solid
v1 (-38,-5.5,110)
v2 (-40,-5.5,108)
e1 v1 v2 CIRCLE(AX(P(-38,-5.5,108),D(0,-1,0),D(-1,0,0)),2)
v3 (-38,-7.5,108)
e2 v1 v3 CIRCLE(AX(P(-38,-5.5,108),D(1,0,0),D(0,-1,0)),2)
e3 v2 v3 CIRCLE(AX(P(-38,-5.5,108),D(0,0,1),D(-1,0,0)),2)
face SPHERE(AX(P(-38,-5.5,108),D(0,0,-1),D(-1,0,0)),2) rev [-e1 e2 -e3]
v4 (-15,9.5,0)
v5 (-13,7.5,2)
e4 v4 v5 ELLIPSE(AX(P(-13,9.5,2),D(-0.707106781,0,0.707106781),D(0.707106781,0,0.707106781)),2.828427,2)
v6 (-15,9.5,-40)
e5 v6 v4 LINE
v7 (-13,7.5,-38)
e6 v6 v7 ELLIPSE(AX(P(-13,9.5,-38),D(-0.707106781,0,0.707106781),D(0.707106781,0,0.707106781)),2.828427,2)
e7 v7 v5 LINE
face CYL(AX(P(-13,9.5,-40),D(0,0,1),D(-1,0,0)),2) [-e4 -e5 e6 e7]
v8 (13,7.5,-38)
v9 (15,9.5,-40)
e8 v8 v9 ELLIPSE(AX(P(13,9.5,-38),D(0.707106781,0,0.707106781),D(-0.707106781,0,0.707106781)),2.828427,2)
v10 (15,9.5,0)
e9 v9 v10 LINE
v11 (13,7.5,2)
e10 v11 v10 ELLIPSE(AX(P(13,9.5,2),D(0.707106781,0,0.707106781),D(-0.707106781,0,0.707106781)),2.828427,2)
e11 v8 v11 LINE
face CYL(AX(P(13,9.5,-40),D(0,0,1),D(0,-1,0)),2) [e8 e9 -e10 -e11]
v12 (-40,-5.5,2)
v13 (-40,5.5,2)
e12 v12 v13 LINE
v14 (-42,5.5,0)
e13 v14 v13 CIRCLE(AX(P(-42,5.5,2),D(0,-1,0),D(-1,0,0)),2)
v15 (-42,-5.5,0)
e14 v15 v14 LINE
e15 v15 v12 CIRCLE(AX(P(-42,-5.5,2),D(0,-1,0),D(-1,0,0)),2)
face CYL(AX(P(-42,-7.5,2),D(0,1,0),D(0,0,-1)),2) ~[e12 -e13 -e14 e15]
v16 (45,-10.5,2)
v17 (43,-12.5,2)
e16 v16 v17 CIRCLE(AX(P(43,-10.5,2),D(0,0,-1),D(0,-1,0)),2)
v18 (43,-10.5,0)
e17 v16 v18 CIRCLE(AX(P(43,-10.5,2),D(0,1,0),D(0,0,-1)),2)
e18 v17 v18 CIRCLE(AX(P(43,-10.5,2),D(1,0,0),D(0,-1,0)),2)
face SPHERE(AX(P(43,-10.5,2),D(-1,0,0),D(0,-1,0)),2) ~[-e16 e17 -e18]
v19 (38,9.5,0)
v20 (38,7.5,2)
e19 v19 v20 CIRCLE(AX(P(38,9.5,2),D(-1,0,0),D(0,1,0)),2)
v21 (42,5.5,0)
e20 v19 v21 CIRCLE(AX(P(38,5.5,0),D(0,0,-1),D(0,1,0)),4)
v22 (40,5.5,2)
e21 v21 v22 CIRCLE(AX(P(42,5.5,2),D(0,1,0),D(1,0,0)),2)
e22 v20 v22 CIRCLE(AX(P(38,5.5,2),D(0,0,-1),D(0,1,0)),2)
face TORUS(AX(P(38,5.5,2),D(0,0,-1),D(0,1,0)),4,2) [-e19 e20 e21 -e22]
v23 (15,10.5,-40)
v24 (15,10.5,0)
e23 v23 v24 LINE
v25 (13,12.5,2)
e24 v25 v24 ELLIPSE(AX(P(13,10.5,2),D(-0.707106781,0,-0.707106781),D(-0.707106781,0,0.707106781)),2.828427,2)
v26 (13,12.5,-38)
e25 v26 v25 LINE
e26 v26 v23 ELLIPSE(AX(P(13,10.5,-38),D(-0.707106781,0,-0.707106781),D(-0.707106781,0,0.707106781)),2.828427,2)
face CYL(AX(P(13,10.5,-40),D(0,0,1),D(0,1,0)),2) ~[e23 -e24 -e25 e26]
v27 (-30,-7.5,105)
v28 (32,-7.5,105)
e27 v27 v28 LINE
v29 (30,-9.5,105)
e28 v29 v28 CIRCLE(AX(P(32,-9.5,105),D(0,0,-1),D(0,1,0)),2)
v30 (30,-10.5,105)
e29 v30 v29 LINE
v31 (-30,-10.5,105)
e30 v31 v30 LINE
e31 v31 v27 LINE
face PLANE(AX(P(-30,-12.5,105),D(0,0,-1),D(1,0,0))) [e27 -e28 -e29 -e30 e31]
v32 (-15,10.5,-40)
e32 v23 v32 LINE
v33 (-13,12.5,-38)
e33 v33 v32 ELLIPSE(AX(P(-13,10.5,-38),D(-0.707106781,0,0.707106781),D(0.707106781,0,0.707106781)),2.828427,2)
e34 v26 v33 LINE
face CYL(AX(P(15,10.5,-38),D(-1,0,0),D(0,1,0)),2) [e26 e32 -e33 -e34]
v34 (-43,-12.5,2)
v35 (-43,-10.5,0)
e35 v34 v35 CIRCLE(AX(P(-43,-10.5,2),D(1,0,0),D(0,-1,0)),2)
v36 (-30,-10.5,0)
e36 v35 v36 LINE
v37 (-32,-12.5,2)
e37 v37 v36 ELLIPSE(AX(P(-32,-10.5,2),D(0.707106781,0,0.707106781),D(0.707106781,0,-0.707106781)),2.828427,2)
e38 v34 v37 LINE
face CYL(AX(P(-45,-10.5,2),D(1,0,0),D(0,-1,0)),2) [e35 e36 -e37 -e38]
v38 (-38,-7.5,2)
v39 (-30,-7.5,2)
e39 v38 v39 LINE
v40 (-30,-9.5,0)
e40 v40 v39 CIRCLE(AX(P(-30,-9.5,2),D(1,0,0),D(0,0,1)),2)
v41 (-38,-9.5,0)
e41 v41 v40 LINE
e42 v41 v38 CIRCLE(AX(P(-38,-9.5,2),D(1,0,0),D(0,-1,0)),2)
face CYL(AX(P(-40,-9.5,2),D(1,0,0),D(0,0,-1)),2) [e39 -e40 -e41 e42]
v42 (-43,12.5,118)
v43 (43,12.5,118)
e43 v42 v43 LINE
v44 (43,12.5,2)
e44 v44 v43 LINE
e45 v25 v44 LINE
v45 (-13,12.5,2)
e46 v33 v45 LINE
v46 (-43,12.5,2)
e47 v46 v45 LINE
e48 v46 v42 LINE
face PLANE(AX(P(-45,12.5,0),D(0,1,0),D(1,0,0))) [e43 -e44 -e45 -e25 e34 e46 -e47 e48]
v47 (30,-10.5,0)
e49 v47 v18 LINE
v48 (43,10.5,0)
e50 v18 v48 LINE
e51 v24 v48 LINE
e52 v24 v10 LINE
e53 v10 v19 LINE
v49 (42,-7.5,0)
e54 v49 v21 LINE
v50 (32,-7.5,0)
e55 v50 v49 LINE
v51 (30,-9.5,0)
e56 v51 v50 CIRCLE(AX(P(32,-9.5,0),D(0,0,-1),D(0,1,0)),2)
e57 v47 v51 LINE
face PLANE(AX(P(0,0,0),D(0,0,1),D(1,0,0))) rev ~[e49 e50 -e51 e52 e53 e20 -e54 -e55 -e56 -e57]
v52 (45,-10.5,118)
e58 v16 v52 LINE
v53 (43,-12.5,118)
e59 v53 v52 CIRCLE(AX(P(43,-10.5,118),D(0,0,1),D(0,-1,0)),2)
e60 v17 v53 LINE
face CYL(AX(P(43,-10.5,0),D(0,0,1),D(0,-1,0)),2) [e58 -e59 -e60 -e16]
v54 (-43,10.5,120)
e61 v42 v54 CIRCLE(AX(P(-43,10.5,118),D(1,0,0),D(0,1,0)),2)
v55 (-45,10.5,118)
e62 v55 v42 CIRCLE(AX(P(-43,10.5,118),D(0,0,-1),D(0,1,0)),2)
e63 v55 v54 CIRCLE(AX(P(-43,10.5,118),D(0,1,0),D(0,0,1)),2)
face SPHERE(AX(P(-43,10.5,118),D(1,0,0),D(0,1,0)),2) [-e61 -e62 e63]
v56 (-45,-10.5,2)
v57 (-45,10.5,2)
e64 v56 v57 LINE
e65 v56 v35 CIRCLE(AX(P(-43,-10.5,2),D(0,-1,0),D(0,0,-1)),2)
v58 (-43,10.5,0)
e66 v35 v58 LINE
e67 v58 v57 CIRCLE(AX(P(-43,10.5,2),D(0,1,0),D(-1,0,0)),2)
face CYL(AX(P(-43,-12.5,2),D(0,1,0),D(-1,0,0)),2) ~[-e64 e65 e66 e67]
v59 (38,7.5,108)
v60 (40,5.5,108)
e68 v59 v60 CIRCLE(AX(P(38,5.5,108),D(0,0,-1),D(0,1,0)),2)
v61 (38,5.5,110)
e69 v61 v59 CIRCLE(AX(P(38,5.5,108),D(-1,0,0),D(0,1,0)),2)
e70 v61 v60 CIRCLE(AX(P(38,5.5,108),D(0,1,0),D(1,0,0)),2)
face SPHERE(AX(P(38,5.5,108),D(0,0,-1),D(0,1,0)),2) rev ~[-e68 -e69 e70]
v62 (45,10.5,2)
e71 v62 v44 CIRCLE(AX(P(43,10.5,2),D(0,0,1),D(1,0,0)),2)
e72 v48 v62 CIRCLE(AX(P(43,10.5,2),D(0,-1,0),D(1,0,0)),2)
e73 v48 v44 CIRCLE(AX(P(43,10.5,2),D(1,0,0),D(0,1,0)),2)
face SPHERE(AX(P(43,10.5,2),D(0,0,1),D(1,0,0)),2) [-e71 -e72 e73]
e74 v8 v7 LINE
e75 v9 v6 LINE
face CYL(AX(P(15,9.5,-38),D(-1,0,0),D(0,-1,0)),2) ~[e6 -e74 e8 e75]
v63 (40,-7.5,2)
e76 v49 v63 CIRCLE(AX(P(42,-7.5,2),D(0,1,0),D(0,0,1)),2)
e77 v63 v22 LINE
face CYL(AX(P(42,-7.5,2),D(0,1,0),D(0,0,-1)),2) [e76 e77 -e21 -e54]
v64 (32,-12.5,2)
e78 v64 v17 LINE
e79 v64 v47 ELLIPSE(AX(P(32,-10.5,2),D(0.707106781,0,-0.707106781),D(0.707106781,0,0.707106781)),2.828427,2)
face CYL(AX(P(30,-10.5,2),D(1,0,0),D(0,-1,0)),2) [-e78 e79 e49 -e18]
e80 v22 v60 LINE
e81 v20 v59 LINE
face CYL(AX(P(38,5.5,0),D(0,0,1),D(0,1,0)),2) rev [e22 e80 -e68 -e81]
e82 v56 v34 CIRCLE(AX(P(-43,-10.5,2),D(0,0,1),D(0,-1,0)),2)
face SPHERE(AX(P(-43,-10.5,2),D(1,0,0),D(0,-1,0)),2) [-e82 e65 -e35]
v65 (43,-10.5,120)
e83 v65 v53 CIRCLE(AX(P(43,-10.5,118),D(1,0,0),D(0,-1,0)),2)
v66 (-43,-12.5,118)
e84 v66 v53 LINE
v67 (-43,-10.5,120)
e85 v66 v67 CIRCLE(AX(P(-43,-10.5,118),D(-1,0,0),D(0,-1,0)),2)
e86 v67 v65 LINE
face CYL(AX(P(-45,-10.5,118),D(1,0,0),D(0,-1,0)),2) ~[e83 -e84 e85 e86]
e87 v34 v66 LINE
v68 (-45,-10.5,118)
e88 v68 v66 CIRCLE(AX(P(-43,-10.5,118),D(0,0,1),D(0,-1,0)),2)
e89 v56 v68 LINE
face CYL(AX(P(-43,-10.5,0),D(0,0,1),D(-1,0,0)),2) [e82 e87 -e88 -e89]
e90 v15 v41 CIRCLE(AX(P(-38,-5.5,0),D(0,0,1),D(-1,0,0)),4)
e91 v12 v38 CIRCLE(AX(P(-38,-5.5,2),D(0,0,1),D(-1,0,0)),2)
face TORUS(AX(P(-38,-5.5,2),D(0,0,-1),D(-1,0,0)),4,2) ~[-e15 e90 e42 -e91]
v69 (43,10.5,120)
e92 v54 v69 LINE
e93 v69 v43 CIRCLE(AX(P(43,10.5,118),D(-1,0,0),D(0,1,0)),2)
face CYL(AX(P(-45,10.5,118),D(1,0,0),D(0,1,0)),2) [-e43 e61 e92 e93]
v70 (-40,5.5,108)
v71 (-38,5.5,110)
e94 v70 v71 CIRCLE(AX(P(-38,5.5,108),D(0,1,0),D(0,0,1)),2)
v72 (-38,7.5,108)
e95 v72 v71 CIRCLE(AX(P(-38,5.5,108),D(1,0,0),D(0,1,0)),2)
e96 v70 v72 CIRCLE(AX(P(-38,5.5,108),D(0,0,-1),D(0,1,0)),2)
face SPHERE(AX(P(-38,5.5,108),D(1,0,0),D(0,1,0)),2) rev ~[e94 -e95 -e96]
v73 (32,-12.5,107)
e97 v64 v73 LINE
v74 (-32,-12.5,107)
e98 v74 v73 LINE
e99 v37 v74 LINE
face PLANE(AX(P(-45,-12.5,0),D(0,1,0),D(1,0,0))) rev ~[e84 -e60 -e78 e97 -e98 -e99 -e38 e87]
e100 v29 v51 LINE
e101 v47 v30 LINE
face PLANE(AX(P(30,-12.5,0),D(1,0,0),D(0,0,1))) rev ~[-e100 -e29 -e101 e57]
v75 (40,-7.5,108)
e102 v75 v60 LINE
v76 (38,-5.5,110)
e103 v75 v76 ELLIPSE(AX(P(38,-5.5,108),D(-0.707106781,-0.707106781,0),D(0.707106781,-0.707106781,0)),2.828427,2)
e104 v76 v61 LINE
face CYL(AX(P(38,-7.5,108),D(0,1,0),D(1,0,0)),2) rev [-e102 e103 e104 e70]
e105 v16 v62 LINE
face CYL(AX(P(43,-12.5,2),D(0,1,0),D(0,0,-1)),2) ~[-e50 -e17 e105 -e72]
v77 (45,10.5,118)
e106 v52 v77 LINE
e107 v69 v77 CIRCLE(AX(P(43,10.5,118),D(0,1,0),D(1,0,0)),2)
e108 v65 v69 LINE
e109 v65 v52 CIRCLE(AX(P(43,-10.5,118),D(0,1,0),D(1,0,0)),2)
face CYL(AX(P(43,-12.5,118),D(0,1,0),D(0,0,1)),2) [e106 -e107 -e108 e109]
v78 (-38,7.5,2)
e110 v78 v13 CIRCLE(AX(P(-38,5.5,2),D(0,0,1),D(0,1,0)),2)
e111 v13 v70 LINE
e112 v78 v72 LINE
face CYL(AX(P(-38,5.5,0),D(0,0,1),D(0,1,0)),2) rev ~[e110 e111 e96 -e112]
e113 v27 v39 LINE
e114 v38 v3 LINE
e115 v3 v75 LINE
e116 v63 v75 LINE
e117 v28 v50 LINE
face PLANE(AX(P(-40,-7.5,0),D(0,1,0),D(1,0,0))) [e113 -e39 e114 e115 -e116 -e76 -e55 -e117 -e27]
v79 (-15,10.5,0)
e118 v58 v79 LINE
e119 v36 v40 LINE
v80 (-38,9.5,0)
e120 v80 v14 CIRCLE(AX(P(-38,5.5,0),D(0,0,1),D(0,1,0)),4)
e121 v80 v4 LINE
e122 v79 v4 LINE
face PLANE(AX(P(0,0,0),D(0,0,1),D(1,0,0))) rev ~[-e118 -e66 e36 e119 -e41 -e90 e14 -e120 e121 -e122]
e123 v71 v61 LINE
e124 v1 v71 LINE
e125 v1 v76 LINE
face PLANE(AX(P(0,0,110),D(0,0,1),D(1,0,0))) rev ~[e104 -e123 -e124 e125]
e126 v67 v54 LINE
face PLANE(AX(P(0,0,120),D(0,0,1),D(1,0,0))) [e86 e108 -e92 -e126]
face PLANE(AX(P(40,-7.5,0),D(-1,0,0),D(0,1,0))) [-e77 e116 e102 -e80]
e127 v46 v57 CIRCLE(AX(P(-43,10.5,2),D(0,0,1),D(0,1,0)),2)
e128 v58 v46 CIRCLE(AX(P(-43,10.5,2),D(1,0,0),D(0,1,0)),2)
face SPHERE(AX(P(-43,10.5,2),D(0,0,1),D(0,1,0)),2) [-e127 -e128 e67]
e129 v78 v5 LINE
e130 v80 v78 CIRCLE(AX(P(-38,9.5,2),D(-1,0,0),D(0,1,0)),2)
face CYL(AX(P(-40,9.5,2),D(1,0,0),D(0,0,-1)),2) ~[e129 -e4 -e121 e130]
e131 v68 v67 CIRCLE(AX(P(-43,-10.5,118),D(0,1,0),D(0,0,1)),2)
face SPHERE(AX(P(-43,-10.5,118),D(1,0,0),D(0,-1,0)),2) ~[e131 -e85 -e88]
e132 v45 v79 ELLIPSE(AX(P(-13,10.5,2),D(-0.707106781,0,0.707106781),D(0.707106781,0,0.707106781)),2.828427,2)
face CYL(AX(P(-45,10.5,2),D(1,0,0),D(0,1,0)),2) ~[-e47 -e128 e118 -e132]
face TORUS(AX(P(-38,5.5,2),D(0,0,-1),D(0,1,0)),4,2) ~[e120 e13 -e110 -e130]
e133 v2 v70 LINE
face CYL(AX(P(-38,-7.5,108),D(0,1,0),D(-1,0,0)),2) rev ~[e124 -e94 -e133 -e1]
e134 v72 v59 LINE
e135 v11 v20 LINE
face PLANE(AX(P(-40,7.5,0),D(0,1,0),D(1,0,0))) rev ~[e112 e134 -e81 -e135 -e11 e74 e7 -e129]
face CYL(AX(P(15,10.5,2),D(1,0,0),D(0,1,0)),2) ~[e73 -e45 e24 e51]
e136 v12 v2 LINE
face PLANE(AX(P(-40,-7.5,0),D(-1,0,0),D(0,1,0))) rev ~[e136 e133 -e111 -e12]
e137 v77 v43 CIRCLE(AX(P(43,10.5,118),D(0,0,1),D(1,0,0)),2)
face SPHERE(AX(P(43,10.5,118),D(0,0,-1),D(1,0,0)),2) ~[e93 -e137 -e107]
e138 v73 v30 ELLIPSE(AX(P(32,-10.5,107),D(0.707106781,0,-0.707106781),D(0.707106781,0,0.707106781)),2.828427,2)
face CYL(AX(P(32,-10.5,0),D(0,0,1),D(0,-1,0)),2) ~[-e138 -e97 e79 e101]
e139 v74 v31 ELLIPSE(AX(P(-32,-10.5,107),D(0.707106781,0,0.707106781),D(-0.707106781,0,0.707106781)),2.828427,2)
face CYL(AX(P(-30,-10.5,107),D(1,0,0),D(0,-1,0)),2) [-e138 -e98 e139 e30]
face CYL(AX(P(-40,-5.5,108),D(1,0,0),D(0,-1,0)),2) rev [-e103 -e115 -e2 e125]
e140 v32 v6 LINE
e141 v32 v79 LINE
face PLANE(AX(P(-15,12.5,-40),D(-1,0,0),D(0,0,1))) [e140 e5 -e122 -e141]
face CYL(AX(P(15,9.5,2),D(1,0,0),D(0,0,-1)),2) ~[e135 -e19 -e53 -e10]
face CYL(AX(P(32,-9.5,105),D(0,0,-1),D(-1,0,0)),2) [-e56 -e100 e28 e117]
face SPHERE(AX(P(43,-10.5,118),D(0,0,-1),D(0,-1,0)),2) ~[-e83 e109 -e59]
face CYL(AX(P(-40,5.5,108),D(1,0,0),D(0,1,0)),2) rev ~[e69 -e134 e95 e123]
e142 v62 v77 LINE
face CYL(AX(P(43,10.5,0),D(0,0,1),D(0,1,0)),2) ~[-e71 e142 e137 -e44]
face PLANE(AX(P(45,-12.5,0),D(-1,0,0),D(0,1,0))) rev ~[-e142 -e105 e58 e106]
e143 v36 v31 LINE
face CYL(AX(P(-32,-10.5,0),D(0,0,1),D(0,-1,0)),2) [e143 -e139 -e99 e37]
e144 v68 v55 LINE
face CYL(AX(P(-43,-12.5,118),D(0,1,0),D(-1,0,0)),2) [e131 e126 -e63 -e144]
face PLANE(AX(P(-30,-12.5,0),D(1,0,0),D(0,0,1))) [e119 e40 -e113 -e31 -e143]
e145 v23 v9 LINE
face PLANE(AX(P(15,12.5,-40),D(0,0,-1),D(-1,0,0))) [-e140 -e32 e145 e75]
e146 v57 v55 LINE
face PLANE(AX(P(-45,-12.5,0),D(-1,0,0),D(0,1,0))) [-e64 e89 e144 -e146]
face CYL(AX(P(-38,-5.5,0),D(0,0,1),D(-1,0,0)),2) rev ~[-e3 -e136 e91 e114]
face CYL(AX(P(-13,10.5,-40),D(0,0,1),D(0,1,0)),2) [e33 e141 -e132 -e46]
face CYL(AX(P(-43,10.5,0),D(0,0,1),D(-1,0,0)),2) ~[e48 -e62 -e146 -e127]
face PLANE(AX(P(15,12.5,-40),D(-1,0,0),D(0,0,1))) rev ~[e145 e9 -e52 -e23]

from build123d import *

# Parameters (mm, degrees)
F0_W     = 90
F0_H     = 25
F0_W_2   = 80
F0_H_2   = 15
F1_DEPTH = 120
F3_DEPTH = 110
F2_W     = 60
F2_H     = 105
F4_DEPTH = 10
F5_W     = 30
F5_H     = 40
F6_DEPTH = 5
F7_R     = 2


with BuildPart() as f1:
    # F0 (on Top) → F1 (new body)
    with BuildSketch(Plane.XY):
        Rectangle(F0_W, F0_H)
        Rectangle(F0_W_2, F0_H_2, mode=Mode.SUBTRACT)
        Rectangle(F0_W_2, F0_H_2)
    extrude(amount=F1_DEPTH)

    # F0 (on Top) → F3 (cut)
    with BuildSketch(Plane.XY):
        Rectangle(F0_W_2, F0_H_2)
    extrude(amount=F3_DEPTH, mode=Mode.SUBTRACT)

    # F2 (on face) → F4 (cut)
    with BuildSketch(Plane.XZ.offset(12.5)):
        with Locations((0, 52.5)):
            Rectangle(F2_W, F2_H)
    extrude(amount=-F4_DEPTH, mode=Mode.SUBTRACT)

    # F5 (on face) → F6 (join)
    with BuildSketch(Plane(origin=(0, 12.5, 0), x_dir=(-1, 0, 0), z_dir=(0, 1, 0))):
        with Locations((0, -20)):
            Rectangle(F5_W, F5_H)
    extrude(amount=-F6_DEPTH)

    # F7
    f7_edges = [f1.edges().sort_by_distance(p)[0] for p in [
        (40, 7.5, 55),
        (0, 7.5, 110),
        (-40, 7.5, 55),
        (-27.5, 7.5, 0),
        (-15, 7.5, -20),
        (0, 7.5, -40),
        (15, 7.5, -20),
        (27.5, 7.5, 0),
        (30, -7.5, 52.5),
        (-40, -7.5, 55),
        (-40, 0, 110),
        (0, -7.5, 110),
        (40, 0, 110),
        (-37.5, -12.5, 0),
        (-30, -12.5, 52.5),
        (0, -12.5, 105),
        (30, -12.5, 52.5),
        (37.5, -12.5, 0),
        (45, -12.5, 60),
        (0, -12.5, 120),
        (-45, -12.5, 60),
        (45, 12.5, 60),
        (45, 0, 0),
        (45, 0, 120),
        (0, 12.5, 120),
        (-45, 12.5, 60),
        (-30, 12.5, 0),
        (-15, 12.5, -20),
        (0, 12.5, -40),
        (15, 12.5, -20),
        (30, 12.5, 0),
        (-45, 0, 0),
        (-45, 0, 120),
        (-40, 0, 0),
        (-35, -7.5, 0),
        (40, 0, 0),
    ]]
    fillet(f7_edges, radius=F7_R)


solid = f1.part
